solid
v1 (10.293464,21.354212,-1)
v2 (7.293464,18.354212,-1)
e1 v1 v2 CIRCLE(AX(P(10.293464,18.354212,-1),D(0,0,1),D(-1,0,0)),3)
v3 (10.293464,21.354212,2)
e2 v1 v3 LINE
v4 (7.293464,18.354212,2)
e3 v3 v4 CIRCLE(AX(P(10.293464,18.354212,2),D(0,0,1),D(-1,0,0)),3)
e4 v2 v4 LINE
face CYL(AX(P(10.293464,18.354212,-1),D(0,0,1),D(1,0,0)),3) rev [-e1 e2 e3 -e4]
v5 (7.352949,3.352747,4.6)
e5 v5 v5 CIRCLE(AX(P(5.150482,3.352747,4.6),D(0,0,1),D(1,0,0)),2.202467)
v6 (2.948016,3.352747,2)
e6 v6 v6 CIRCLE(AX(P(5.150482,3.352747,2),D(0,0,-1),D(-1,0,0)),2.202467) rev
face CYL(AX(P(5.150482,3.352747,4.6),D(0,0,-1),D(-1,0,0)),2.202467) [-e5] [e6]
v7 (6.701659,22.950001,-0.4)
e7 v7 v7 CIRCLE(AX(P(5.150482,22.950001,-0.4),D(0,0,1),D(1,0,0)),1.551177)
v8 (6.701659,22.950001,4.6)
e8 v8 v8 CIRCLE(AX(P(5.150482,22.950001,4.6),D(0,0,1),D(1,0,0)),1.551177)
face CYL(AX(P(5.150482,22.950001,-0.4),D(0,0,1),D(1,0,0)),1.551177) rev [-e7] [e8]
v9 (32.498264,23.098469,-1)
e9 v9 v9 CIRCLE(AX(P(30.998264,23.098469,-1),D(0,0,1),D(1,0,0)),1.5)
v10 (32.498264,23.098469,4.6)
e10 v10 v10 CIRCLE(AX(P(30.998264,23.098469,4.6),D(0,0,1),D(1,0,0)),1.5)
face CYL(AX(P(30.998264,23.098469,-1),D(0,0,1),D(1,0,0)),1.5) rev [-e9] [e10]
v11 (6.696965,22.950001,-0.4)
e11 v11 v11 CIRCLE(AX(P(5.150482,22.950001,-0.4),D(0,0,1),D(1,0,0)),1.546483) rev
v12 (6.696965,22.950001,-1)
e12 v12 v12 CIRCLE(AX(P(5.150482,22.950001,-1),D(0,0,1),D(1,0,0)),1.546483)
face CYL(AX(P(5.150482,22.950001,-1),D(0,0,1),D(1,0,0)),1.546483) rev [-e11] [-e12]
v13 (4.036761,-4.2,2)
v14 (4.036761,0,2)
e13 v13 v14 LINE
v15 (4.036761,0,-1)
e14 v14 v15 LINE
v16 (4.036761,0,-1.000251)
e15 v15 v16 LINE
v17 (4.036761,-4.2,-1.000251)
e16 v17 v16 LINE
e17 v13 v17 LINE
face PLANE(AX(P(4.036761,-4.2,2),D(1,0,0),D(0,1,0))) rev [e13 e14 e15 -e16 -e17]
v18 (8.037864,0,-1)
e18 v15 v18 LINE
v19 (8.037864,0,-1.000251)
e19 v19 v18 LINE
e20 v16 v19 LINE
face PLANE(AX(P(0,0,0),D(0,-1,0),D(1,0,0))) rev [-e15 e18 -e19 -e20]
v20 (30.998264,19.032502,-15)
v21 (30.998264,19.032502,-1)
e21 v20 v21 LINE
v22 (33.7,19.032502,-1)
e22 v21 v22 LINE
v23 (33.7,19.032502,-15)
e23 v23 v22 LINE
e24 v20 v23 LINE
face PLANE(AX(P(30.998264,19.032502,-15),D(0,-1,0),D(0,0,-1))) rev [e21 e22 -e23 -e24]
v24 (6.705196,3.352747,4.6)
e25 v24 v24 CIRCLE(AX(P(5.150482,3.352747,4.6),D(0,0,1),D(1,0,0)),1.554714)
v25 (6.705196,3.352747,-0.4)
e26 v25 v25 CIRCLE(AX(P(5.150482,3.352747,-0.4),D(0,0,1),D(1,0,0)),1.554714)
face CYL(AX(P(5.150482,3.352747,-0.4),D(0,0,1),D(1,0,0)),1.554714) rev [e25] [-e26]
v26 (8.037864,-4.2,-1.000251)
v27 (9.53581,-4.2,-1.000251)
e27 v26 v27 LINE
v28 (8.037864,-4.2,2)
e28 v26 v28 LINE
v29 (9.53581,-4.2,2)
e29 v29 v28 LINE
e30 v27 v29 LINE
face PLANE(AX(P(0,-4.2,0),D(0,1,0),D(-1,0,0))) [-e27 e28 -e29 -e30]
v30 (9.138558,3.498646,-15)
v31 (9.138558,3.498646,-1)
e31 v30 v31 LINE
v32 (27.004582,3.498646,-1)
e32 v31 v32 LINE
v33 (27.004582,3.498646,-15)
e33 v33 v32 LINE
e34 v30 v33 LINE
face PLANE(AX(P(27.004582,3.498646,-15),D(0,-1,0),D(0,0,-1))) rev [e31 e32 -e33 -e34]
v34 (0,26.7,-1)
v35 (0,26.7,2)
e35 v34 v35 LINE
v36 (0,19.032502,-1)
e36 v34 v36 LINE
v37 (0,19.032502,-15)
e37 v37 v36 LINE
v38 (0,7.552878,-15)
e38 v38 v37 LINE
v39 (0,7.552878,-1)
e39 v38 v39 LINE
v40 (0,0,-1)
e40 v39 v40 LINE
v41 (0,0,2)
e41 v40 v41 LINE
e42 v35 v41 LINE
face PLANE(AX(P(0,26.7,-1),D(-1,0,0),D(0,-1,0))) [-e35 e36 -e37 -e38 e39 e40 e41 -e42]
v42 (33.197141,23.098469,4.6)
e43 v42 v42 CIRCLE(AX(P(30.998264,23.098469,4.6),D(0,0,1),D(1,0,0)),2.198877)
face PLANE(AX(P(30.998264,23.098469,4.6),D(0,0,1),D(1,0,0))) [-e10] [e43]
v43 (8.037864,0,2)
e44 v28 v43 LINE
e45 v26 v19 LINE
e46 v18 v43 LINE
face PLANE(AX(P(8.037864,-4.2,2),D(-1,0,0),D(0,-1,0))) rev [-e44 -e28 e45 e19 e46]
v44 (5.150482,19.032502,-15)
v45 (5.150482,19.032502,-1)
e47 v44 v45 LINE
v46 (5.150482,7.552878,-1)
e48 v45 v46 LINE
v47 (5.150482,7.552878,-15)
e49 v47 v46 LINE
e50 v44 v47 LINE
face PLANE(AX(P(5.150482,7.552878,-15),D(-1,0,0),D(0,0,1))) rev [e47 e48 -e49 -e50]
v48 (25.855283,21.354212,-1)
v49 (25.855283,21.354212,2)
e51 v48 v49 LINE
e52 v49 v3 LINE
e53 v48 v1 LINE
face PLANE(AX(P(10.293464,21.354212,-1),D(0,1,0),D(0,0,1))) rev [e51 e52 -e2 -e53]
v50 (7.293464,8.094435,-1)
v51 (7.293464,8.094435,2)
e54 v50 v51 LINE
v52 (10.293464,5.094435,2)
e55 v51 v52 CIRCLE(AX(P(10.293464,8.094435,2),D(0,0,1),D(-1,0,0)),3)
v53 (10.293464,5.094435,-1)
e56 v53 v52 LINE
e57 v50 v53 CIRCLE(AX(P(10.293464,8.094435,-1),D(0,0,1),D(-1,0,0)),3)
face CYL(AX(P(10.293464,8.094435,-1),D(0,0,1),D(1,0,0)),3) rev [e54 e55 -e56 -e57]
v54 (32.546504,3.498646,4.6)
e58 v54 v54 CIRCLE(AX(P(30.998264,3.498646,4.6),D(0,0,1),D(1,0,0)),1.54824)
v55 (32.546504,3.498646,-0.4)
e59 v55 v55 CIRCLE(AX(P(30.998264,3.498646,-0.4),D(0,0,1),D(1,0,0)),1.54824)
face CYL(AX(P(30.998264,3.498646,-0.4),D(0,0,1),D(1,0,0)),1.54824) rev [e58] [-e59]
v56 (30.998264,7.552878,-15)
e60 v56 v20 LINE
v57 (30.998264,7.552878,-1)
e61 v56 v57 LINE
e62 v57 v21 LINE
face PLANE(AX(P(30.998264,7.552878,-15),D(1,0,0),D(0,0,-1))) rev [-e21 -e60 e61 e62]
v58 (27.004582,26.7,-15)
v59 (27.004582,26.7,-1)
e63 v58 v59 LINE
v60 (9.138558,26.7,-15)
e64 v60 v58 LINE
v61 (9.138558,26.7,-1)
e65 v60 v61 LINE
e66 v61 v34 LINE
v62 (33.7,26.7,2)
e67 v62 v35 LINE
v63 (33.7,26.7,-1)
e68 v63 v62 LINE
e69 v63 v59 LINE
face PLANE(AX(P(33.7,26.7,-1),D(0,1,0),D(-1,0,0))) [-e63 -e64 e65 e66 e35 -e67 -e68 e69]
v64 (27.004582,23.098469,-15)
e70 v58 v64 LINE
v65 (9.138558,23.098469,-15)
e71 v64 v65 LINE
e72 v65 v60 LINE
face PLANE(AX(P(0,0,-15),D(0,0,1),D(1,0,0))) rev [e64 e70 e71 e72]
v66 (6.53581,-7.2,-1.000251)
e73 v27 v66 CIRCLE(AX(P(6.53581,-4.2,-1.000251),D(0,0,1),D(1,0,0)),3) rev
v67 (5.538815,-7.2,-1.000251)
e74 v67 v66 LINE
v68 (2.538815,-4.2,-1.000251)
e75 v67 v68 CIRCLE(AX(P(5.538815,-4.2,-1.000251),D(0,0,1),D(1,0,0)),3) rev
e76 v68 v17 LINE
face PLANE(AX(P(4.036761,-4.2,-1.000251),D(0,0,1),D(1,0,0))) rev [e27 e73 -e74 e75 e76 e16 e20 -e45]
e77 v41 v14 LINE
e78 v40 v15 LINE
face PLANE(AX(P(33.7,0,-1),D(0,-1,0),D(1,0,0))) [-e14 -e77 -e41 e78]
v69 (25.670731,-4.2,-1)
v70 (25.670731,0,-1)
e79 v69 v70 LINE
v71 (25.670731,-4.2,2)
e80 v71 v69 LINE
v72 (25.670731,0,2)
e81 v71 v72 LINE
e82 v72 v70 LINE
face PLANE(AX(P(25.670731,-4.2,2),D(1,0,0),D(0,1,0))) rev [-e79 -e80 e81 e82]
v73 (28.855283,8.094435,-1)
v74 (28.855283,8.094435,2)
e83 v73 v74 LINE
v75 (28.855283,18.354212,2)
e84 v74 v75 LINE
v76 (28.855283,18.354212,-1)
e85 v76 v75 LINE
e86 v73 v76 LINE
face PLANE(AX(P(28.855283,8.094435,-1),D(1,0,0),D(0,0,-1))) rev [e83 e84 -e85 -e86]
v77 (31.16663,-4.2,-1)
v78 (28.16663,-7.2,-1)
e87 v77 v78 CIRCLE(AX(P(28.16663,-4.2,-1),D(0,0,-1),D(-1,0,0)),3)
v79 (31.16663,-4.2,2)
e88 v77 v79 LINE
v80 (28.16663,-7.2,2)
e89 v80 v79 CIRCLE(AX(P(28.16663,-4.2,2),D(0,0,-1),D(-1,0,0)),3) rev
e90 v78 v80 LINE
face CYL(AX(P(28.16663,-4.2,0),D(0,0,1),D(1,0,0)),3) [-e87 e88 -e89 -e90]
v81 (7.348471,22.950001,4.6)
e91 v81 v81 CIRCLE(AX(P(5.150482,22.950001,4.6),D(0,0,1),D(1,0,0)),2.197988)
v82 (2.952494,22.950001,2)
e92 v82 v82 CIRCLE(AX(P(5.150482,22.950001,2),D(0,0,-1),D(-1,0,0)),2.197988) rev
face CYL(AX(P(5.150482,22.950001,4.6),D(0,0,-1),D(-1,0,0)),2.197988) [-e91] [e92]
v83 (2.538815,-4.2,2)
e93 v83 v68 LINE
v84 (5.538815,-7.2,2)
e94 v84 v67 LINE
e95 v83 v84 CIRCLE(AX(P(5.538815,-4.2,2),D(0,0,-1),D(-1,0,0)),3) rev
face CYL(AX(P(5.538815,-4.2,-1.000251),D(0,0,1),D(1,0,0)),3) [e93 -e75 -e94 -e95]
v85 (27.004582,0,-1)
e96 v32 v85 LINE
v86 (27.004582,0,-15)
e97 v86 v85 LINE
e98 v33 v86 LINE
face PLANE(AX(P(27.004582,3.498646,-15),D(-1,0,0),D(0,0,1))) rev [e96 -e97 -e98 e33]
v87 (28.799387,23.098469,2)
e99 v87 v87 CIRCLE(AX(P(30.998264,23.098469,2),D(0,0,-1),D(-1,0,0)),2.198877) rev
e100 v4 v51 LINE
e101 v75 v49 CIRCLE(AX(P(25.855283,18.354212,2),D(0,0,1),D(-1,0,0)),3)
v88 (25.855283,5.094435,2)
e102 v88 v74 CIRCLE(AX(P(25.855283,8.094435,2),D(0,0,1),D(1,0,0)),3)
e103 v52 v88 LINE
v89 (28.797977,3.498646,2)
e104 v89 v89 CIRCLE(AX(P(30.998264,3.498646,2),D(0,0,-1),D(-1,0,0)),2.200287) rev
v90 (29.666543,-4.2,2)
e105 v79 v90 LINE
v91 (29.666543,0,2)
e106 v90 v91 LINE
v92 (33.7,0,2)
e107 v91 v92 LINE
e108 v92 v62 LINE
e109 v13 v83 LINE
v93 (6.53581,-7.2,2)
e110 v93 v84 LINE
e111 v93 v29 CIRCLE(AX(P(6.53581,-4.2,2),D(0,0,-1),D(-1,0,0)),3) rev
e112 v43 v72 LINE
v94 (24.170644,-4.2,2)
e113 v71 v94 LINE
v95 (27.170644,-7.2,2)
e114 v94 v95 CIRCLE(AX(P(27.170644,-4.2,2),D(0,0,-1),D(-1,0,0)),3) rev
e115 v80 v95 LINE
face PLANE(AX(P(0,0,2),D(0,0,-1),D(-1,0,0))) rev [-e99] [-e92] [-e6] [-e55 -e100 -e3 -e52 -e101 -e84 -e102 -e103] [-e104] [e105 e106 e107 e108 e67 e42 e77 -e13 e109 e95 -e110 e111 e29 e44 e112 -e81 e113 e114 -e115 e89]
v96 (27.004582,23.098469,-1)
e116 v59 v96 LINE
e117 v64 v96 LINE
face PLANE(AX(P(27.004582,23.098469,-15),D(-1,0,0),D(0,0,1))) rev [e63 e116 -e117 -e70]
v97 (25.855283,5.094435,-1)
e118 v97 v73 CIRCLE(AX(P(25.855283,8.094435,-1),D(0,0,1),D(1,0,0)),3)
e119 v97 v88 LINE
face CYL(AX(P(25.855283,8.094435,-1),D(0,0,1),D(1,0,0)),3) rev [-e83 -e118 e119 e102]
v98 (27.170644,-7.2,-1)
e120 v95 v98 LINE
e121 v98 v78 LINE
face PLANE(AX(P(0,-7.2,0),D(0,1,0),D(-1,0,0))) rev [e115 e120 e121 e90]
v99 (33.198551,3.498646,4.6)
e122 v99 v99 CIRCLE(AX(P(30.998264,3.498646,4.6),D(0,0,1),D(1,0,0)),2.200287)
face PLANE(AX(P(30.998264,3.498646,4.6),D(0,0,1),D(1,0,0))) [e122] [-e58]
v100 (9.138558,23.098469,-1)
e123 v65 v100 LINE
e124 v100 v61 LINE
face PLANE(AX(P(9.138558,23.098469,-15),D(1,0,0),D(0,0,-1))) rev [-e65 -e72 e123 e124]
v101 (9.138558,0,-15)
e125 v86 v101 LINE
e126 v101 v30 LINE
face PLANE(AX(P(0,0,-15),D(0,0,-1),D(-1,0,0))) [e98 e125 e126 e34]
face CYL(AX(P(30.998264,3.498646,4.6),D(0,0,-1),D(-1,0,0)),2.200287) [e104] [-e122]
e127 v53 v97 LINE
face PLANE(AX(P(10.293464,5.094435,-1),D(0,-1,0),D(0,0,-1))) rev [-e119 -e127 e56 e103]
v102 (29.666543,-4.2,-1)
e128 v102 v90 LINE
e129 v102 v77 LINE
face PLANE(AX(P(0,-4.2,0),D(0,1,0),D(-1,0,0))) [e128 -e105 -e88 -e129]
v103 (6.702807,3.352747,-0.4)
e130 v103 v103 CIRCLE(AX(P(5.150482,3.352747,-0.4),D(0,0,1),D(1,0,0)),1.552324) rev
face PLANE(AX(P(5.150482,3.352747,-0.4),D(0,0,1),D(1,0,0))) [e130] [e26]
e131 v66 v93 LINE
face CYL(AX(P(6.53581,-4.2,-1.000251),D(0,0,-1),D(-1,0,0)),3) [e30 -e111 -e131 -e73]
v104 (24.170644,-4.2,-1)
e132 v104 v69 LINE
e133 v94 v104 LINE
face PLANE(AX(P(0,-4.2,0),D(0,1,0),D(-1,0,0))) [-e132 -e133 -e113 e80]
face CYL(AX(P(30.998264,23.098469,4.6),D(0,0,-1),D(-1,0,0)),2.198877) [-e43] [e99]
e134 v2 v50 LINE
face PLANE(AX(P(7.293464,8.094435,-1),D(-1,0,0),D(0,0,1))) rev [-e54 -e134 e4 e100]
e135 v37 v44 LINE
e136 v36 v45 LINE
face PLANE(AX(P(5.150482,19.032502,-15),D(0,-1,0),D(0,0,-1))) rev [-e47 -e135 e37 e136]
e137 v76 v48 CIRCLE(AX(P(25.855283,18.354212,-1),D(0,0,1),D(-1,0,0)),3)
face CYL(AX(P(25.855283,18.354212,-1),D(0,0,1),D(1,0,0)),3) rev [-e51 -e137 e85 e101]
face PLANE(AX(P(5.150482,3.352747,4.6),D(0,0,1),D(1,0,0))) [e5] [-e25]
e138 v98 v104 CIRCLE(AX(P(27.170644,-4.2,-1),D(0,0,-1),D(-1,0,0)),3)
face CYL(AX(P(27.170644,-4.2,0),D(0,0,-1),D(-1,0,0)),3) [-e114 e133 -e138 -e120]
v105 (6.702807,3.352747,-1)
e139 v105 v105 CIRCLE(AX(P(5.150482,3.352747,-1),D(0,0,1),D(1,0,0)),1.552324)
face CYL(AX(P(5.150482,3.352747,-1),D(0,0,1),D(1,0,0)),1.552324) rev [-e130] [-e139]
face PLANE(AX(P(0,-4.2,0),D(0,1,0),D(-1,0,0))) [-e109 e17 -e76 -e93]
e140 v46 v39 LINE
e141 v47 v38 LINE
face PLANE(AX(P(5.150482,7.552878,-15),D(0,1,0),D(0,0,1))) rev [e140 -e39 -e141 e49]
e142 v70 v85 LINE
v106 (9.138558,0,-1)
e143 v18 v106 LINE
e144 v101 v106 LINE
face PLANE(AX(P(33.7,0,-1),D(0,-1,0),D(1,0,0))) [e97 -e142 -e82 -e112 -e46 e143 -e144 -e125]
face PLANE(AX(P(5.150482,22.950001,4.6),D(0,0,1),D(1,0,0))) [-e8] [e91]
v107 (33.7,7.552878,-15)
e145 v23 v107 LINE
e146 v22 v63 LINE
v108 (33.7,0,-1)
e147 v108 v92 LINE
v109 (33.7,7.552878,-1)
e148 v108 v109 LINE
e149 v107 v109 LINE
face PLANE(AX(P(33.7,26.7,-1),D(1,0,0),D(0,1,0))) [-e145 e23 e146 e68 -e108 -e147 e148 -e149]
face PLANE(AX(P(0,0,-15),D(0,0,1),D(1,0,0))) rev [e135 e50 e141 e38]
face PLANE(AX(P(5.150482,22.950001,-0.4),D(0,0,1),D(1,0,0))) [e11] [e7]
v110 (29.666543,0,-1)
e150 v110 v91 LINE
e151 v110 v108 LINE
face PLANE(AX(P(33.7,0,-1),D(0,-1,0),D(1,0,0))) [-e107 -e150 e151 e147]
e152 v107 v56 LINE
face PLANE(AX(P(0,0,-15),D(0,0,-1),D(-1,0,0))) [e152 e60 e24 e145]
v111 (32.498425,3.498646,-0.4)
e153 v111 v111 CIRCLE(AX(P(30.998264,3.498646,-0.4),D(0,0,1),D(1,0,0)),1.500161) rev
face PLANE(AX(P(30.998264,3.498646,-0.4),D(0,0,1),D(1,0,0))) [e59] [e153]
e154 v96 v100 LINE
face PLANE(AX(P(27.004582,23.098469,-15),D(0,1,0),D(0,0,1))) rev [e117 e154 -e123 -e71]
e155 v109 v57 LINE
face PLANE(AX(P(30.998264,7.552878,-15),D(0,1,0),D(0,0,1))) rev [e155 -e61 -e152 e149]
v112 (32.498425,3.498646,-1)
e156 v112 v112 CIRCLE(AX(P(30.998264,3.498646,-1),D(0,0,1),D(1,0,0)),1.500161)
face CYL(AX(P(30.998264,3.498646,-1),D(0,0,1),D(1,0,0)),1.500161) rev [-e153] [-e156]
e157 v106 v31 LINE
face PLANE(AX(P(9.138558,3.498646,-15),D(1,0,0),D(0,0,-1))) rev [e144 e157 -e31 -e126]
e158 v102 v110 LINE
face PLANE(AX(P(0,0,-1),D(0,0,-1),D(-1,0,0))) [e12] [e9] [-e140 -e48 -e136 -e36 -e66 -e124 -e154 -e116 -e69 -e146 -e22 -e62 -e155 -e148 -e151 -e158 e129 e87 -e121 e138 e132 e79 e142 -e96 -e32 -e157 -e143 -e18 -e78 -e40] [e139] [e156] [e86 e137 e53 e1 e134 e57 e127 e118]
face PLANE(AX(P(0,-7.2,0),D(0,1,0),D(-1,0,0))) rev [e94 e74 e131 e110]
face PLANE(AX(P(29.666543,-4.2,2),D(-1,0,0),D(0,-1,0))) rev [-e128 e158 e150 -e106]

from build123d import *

# Parameters (mm, degrees)
EXTRUDE_1_DEPTH      = 2
EXTRUDE_1_DEPTH_BACK = 1
SKETCH_2_W           = 33.7
SKETCH_2_H           = 26.7
SKETCH_2_R           = 1.500160794
SKETCH_2_R_2         = 1.5
SKETCH_2_R_3         = 1.552324123
SKETCH_2_R_4         = 1.546482565
CUT_EXTRUDE_1_DEPTH  = 3
SKETCH_5_R           = 2.197988189
SKETCH_5_R_2         = 2.198876818
SKETCH_5_R_3         = 2.200287149
SKETCH_5_R_4         = 2.202466949
EXTRUDE_2_DEPTH      = 2.6
CUT_EXTRUDE_START    = -5
SKETCH_6_R           = 1.551176975
SKETCH_6_R_2         = 1.55471391
SKETCH_6_R_3         = 1.548240493
SKETCH_6_R_4         = 1.5
CUT_EXTRUDE_2_DEPTH  = 5
SKETCH_10_W          = 17.866024145
SKETCH_10_H          = 3.498646338
SKETCH_10_H_2        = 3.601530827
SKETCH_10_W_2        = 2.701736104
SKETCH_10_H_3        = 11.479623975
SKETCH_10_W_3        = 5.150482455
EXTRUDE_4_DEPTH      = 14
SKETCH_11_W          = 4.001103287
SKETCH_11_H          = 3.000250535
SKETCH_11_W_2        = 3.995812133
SKETCH_11_H_2        = 3
EXTRUDE_5_DEPTH      = 4.2
SKETCH_12_W          = 6.996994273
SKETCH_12_H          = 3.000250535
SKETCH_12_W_2        = 6.995985491
SKETCH_12_H_2        = 3
EXTRUDE_6_DEPTH      = 3
FILLET_4_R           = 3
FILLET_5_R           = 3
FILLET_6_R           = 3
FILLET_7_R           = 3


with BuildPart() as part:
    # Эскиз2 → Бобышка-Вытянуть1 (new, two sides: drawn at the far end of the back side and taken through both)
    with BuildSketch(Plane.XY.offset(-EXTRUDE_1_DEPTH_BACK)):
        with Locations((16.85, 13.35)):
            Rectangle(SKETCH_2_W, SKETCH_2_H)
        with Locations((30.998263896, 3.498646338)):
            Circle(SKETCH_2_R, mode=Mode.SUBTRACT)
        with Locations((30.998263896, 23.098469173)):
            Circle(SKETCH_2_R_2, mode=Mode.SUBTRACT)
        with Locations((5.150482455, 3.352746683)):
            Circle(SKETCH_2_R_3, mode=Mode.SUBTRACT)
        with Locations((5.150482455, 22.950000581)):
            Circle(SKETCH_2_R_4, mode=Mode.SUBTRACT)
    extrude(amount=EXTRUDE_1_DEPTH + EXTRUDE_1_DEPTH_BACK)

    # Эскиз4 → Вырез-Вытянуть1 (cut)
    with BuildSketch(Plane.XY.offset(2)):
        with BuildLine():
            Line((10.293463676, 5.094435071), (25.855282675, 5.094435071))
            ThreePointArc((25.855282675, 5.094435071), (27.976603018, 5.973114728), (28.855282675, 8.094435071))
            Line((28.855282675, 8.094435071), (28.855282675, 18.354211847))
            ThreePointArc((28.855282675, 18.354211847), (27.976603018, 20.475532191), (25.855282675, 21.354211847))
            Line((25.855282675, 21.354211847), (10.293463676, 21.354211847))
            ThreePointArc((10.293463676, 21.354211847), (8.172143332, 20.475532191), (7.293463676, 18.354211847))
            Line((7.293463676, 18.354211847), (7.293463676, 8.094435071))
            ThreePointArc((7.293463676, 8.094435071), (8.172143332, 5.973114728), (10.293463676, 5.094435071))
        make_face()
    extrude(amount=-CUT_EXTRUDE_1_DEPTH, mode=Mode.SUBTRACT)

    # Эскиз5 → Бобышка-Вытянуть2 (add)
    with BuildSketch(Plane.XY.offset(2)):
        with Locations(Location((5.150482455, 22.950000581, 0), (0, 0, 180))):
            Circle(SKETCH_5_R)
        with Locations(Location((30.998263896, 23.098469173, 0), (0, 0, 180))):
            Circle(SKETCH_5_R_2)
        with Locations(Location((30.998263896, 3.498646338, 0), (0, 0, 180))):
            Circle(SKETCH_5_R_3)
        with Locations(Location((5.150482455, 3.352746683, 0), (0, 0, 180))):
            Circle(SKETCH_5_R_4)
    extrude(amount=EXTRUDE_2_DEPTH)

    # Эскиз6 → Вырез-Вытянуть2 (cut)
    with BuildSketch(Plane.XY.offset(4.6).offset(CUT_EXTRUDE_START)):
        with Locations((5.150482455, 22.950000581)):
            Circle(SKETCH_6_R)
        with Locations((5.150482455, 3.352746683)):
            Circle(SKETCH_6_R_2)
        with Locations((30.998263896, 3.498646338)):
            Circle(SKETCH_6_R_3)
        with Locations((30.998263896, 23.098469173)):
            Circle(SKETCH_6_R_4)
    extrude(amount=CUT_EXTRUDE_2_DEPTH, mode=Mode.SUBTRACT)

    # Эскиз10 → Бобышка-Вытянуть4 (add)
    with BuildSketch(Plane(origin=(0, 0, -1), x_dir=(-1, 0, 0), z_dir=(0, 0, -1))):
        with Locations((-18.071569917, 1.749323169)):
            Rectangle(SKETCH_10_W, SKETCH_10_H)
        with Locations((-18.071569917, 24.899234587)):
            Rectangle(SKETCH_10_W, SKETCH_10_H_2)
        with Locations((-32.349131948, 13.292689749)):
            Rectangle(SKETCH_10_W_2, SKETCH_10_H_3)
        with Locations((-2.575241228, 13.292689749)):
            Rectangle(SKETCH_10_W_3, SKETCH_10_H_3)
    extrude(amount=EXTRUDE_4_DEPTH)

    # Эскиз11 → Бобышка-Вытянуть5 (add)
    with BuildSketch(Plane.XZ):
        with Locations((6.037312514, 0.499874732)):
            Rectangle(SKETCH_11_W, SKETCH_11_H)
        with Locations((27.668636997, 0.5)):
            Rectangle(SKETCH_11_W_2, SKETCH_11_H_2)
    extrude(amount=EXTRUDE_5_DEPTH)

    # Эскиз12 → Бобышка-Вытянуть6 (add)
    with BuildSketch(Plane.XZ.offset(4.2)):
        with Locations((6.037312514, 0.499874732)):
            Rectangle(SKETCH_12_W, SKETCH_12_H)
        with Locations((27.668636997, 0.5)):
            Rectangle(SKETCH_12_W_2, SKETCH_12_H_2)
    extrude(amount=EXTRUDE_6_DEPTH)

    # Скругление4
    fillet_4_edges = [part.edges().sort_by_distance(p)[0] for p in [
        (2.538815377, -7.2, 0.499874732),
    ]]
    fillet(fillet_4_edges, radius=FILLET_4_R - 0.0001)  # a hair under: the kernel refuses the full size

    # Скругление5
    fillet_5_edges = [part.edges().sort_by_distance(p)[0] for p in [
        (9.53580965, -7.2, 0.499874732),
    ]]
    fillet(fillet_5_edges, radius=FILLET_5_R - 0.0001)  # a hair under: the kernel refuses the full size

    # Скругление6
    fillet_6_edges = [part.edges().sort_by_distance(p)[0] for p in [
        (31.166629742, -7.2, 0.5),
    ]]
    fillet(fillet_6_edges, radius=FILLET_6_R - 0.0001)  # a hair under: the kernel refuses the full size

    # Скругление7
    fillet_7_edges = [part.edges().sort_by_distance(p)[0] for p in [
        (24.170644251, -7.2, 0.5),
    ]]
    fillet(fillet_7_edges, radius=FILLET_7_R - 0.0001)  # a hair under: the kernel refuses the full size


solid = part.part
